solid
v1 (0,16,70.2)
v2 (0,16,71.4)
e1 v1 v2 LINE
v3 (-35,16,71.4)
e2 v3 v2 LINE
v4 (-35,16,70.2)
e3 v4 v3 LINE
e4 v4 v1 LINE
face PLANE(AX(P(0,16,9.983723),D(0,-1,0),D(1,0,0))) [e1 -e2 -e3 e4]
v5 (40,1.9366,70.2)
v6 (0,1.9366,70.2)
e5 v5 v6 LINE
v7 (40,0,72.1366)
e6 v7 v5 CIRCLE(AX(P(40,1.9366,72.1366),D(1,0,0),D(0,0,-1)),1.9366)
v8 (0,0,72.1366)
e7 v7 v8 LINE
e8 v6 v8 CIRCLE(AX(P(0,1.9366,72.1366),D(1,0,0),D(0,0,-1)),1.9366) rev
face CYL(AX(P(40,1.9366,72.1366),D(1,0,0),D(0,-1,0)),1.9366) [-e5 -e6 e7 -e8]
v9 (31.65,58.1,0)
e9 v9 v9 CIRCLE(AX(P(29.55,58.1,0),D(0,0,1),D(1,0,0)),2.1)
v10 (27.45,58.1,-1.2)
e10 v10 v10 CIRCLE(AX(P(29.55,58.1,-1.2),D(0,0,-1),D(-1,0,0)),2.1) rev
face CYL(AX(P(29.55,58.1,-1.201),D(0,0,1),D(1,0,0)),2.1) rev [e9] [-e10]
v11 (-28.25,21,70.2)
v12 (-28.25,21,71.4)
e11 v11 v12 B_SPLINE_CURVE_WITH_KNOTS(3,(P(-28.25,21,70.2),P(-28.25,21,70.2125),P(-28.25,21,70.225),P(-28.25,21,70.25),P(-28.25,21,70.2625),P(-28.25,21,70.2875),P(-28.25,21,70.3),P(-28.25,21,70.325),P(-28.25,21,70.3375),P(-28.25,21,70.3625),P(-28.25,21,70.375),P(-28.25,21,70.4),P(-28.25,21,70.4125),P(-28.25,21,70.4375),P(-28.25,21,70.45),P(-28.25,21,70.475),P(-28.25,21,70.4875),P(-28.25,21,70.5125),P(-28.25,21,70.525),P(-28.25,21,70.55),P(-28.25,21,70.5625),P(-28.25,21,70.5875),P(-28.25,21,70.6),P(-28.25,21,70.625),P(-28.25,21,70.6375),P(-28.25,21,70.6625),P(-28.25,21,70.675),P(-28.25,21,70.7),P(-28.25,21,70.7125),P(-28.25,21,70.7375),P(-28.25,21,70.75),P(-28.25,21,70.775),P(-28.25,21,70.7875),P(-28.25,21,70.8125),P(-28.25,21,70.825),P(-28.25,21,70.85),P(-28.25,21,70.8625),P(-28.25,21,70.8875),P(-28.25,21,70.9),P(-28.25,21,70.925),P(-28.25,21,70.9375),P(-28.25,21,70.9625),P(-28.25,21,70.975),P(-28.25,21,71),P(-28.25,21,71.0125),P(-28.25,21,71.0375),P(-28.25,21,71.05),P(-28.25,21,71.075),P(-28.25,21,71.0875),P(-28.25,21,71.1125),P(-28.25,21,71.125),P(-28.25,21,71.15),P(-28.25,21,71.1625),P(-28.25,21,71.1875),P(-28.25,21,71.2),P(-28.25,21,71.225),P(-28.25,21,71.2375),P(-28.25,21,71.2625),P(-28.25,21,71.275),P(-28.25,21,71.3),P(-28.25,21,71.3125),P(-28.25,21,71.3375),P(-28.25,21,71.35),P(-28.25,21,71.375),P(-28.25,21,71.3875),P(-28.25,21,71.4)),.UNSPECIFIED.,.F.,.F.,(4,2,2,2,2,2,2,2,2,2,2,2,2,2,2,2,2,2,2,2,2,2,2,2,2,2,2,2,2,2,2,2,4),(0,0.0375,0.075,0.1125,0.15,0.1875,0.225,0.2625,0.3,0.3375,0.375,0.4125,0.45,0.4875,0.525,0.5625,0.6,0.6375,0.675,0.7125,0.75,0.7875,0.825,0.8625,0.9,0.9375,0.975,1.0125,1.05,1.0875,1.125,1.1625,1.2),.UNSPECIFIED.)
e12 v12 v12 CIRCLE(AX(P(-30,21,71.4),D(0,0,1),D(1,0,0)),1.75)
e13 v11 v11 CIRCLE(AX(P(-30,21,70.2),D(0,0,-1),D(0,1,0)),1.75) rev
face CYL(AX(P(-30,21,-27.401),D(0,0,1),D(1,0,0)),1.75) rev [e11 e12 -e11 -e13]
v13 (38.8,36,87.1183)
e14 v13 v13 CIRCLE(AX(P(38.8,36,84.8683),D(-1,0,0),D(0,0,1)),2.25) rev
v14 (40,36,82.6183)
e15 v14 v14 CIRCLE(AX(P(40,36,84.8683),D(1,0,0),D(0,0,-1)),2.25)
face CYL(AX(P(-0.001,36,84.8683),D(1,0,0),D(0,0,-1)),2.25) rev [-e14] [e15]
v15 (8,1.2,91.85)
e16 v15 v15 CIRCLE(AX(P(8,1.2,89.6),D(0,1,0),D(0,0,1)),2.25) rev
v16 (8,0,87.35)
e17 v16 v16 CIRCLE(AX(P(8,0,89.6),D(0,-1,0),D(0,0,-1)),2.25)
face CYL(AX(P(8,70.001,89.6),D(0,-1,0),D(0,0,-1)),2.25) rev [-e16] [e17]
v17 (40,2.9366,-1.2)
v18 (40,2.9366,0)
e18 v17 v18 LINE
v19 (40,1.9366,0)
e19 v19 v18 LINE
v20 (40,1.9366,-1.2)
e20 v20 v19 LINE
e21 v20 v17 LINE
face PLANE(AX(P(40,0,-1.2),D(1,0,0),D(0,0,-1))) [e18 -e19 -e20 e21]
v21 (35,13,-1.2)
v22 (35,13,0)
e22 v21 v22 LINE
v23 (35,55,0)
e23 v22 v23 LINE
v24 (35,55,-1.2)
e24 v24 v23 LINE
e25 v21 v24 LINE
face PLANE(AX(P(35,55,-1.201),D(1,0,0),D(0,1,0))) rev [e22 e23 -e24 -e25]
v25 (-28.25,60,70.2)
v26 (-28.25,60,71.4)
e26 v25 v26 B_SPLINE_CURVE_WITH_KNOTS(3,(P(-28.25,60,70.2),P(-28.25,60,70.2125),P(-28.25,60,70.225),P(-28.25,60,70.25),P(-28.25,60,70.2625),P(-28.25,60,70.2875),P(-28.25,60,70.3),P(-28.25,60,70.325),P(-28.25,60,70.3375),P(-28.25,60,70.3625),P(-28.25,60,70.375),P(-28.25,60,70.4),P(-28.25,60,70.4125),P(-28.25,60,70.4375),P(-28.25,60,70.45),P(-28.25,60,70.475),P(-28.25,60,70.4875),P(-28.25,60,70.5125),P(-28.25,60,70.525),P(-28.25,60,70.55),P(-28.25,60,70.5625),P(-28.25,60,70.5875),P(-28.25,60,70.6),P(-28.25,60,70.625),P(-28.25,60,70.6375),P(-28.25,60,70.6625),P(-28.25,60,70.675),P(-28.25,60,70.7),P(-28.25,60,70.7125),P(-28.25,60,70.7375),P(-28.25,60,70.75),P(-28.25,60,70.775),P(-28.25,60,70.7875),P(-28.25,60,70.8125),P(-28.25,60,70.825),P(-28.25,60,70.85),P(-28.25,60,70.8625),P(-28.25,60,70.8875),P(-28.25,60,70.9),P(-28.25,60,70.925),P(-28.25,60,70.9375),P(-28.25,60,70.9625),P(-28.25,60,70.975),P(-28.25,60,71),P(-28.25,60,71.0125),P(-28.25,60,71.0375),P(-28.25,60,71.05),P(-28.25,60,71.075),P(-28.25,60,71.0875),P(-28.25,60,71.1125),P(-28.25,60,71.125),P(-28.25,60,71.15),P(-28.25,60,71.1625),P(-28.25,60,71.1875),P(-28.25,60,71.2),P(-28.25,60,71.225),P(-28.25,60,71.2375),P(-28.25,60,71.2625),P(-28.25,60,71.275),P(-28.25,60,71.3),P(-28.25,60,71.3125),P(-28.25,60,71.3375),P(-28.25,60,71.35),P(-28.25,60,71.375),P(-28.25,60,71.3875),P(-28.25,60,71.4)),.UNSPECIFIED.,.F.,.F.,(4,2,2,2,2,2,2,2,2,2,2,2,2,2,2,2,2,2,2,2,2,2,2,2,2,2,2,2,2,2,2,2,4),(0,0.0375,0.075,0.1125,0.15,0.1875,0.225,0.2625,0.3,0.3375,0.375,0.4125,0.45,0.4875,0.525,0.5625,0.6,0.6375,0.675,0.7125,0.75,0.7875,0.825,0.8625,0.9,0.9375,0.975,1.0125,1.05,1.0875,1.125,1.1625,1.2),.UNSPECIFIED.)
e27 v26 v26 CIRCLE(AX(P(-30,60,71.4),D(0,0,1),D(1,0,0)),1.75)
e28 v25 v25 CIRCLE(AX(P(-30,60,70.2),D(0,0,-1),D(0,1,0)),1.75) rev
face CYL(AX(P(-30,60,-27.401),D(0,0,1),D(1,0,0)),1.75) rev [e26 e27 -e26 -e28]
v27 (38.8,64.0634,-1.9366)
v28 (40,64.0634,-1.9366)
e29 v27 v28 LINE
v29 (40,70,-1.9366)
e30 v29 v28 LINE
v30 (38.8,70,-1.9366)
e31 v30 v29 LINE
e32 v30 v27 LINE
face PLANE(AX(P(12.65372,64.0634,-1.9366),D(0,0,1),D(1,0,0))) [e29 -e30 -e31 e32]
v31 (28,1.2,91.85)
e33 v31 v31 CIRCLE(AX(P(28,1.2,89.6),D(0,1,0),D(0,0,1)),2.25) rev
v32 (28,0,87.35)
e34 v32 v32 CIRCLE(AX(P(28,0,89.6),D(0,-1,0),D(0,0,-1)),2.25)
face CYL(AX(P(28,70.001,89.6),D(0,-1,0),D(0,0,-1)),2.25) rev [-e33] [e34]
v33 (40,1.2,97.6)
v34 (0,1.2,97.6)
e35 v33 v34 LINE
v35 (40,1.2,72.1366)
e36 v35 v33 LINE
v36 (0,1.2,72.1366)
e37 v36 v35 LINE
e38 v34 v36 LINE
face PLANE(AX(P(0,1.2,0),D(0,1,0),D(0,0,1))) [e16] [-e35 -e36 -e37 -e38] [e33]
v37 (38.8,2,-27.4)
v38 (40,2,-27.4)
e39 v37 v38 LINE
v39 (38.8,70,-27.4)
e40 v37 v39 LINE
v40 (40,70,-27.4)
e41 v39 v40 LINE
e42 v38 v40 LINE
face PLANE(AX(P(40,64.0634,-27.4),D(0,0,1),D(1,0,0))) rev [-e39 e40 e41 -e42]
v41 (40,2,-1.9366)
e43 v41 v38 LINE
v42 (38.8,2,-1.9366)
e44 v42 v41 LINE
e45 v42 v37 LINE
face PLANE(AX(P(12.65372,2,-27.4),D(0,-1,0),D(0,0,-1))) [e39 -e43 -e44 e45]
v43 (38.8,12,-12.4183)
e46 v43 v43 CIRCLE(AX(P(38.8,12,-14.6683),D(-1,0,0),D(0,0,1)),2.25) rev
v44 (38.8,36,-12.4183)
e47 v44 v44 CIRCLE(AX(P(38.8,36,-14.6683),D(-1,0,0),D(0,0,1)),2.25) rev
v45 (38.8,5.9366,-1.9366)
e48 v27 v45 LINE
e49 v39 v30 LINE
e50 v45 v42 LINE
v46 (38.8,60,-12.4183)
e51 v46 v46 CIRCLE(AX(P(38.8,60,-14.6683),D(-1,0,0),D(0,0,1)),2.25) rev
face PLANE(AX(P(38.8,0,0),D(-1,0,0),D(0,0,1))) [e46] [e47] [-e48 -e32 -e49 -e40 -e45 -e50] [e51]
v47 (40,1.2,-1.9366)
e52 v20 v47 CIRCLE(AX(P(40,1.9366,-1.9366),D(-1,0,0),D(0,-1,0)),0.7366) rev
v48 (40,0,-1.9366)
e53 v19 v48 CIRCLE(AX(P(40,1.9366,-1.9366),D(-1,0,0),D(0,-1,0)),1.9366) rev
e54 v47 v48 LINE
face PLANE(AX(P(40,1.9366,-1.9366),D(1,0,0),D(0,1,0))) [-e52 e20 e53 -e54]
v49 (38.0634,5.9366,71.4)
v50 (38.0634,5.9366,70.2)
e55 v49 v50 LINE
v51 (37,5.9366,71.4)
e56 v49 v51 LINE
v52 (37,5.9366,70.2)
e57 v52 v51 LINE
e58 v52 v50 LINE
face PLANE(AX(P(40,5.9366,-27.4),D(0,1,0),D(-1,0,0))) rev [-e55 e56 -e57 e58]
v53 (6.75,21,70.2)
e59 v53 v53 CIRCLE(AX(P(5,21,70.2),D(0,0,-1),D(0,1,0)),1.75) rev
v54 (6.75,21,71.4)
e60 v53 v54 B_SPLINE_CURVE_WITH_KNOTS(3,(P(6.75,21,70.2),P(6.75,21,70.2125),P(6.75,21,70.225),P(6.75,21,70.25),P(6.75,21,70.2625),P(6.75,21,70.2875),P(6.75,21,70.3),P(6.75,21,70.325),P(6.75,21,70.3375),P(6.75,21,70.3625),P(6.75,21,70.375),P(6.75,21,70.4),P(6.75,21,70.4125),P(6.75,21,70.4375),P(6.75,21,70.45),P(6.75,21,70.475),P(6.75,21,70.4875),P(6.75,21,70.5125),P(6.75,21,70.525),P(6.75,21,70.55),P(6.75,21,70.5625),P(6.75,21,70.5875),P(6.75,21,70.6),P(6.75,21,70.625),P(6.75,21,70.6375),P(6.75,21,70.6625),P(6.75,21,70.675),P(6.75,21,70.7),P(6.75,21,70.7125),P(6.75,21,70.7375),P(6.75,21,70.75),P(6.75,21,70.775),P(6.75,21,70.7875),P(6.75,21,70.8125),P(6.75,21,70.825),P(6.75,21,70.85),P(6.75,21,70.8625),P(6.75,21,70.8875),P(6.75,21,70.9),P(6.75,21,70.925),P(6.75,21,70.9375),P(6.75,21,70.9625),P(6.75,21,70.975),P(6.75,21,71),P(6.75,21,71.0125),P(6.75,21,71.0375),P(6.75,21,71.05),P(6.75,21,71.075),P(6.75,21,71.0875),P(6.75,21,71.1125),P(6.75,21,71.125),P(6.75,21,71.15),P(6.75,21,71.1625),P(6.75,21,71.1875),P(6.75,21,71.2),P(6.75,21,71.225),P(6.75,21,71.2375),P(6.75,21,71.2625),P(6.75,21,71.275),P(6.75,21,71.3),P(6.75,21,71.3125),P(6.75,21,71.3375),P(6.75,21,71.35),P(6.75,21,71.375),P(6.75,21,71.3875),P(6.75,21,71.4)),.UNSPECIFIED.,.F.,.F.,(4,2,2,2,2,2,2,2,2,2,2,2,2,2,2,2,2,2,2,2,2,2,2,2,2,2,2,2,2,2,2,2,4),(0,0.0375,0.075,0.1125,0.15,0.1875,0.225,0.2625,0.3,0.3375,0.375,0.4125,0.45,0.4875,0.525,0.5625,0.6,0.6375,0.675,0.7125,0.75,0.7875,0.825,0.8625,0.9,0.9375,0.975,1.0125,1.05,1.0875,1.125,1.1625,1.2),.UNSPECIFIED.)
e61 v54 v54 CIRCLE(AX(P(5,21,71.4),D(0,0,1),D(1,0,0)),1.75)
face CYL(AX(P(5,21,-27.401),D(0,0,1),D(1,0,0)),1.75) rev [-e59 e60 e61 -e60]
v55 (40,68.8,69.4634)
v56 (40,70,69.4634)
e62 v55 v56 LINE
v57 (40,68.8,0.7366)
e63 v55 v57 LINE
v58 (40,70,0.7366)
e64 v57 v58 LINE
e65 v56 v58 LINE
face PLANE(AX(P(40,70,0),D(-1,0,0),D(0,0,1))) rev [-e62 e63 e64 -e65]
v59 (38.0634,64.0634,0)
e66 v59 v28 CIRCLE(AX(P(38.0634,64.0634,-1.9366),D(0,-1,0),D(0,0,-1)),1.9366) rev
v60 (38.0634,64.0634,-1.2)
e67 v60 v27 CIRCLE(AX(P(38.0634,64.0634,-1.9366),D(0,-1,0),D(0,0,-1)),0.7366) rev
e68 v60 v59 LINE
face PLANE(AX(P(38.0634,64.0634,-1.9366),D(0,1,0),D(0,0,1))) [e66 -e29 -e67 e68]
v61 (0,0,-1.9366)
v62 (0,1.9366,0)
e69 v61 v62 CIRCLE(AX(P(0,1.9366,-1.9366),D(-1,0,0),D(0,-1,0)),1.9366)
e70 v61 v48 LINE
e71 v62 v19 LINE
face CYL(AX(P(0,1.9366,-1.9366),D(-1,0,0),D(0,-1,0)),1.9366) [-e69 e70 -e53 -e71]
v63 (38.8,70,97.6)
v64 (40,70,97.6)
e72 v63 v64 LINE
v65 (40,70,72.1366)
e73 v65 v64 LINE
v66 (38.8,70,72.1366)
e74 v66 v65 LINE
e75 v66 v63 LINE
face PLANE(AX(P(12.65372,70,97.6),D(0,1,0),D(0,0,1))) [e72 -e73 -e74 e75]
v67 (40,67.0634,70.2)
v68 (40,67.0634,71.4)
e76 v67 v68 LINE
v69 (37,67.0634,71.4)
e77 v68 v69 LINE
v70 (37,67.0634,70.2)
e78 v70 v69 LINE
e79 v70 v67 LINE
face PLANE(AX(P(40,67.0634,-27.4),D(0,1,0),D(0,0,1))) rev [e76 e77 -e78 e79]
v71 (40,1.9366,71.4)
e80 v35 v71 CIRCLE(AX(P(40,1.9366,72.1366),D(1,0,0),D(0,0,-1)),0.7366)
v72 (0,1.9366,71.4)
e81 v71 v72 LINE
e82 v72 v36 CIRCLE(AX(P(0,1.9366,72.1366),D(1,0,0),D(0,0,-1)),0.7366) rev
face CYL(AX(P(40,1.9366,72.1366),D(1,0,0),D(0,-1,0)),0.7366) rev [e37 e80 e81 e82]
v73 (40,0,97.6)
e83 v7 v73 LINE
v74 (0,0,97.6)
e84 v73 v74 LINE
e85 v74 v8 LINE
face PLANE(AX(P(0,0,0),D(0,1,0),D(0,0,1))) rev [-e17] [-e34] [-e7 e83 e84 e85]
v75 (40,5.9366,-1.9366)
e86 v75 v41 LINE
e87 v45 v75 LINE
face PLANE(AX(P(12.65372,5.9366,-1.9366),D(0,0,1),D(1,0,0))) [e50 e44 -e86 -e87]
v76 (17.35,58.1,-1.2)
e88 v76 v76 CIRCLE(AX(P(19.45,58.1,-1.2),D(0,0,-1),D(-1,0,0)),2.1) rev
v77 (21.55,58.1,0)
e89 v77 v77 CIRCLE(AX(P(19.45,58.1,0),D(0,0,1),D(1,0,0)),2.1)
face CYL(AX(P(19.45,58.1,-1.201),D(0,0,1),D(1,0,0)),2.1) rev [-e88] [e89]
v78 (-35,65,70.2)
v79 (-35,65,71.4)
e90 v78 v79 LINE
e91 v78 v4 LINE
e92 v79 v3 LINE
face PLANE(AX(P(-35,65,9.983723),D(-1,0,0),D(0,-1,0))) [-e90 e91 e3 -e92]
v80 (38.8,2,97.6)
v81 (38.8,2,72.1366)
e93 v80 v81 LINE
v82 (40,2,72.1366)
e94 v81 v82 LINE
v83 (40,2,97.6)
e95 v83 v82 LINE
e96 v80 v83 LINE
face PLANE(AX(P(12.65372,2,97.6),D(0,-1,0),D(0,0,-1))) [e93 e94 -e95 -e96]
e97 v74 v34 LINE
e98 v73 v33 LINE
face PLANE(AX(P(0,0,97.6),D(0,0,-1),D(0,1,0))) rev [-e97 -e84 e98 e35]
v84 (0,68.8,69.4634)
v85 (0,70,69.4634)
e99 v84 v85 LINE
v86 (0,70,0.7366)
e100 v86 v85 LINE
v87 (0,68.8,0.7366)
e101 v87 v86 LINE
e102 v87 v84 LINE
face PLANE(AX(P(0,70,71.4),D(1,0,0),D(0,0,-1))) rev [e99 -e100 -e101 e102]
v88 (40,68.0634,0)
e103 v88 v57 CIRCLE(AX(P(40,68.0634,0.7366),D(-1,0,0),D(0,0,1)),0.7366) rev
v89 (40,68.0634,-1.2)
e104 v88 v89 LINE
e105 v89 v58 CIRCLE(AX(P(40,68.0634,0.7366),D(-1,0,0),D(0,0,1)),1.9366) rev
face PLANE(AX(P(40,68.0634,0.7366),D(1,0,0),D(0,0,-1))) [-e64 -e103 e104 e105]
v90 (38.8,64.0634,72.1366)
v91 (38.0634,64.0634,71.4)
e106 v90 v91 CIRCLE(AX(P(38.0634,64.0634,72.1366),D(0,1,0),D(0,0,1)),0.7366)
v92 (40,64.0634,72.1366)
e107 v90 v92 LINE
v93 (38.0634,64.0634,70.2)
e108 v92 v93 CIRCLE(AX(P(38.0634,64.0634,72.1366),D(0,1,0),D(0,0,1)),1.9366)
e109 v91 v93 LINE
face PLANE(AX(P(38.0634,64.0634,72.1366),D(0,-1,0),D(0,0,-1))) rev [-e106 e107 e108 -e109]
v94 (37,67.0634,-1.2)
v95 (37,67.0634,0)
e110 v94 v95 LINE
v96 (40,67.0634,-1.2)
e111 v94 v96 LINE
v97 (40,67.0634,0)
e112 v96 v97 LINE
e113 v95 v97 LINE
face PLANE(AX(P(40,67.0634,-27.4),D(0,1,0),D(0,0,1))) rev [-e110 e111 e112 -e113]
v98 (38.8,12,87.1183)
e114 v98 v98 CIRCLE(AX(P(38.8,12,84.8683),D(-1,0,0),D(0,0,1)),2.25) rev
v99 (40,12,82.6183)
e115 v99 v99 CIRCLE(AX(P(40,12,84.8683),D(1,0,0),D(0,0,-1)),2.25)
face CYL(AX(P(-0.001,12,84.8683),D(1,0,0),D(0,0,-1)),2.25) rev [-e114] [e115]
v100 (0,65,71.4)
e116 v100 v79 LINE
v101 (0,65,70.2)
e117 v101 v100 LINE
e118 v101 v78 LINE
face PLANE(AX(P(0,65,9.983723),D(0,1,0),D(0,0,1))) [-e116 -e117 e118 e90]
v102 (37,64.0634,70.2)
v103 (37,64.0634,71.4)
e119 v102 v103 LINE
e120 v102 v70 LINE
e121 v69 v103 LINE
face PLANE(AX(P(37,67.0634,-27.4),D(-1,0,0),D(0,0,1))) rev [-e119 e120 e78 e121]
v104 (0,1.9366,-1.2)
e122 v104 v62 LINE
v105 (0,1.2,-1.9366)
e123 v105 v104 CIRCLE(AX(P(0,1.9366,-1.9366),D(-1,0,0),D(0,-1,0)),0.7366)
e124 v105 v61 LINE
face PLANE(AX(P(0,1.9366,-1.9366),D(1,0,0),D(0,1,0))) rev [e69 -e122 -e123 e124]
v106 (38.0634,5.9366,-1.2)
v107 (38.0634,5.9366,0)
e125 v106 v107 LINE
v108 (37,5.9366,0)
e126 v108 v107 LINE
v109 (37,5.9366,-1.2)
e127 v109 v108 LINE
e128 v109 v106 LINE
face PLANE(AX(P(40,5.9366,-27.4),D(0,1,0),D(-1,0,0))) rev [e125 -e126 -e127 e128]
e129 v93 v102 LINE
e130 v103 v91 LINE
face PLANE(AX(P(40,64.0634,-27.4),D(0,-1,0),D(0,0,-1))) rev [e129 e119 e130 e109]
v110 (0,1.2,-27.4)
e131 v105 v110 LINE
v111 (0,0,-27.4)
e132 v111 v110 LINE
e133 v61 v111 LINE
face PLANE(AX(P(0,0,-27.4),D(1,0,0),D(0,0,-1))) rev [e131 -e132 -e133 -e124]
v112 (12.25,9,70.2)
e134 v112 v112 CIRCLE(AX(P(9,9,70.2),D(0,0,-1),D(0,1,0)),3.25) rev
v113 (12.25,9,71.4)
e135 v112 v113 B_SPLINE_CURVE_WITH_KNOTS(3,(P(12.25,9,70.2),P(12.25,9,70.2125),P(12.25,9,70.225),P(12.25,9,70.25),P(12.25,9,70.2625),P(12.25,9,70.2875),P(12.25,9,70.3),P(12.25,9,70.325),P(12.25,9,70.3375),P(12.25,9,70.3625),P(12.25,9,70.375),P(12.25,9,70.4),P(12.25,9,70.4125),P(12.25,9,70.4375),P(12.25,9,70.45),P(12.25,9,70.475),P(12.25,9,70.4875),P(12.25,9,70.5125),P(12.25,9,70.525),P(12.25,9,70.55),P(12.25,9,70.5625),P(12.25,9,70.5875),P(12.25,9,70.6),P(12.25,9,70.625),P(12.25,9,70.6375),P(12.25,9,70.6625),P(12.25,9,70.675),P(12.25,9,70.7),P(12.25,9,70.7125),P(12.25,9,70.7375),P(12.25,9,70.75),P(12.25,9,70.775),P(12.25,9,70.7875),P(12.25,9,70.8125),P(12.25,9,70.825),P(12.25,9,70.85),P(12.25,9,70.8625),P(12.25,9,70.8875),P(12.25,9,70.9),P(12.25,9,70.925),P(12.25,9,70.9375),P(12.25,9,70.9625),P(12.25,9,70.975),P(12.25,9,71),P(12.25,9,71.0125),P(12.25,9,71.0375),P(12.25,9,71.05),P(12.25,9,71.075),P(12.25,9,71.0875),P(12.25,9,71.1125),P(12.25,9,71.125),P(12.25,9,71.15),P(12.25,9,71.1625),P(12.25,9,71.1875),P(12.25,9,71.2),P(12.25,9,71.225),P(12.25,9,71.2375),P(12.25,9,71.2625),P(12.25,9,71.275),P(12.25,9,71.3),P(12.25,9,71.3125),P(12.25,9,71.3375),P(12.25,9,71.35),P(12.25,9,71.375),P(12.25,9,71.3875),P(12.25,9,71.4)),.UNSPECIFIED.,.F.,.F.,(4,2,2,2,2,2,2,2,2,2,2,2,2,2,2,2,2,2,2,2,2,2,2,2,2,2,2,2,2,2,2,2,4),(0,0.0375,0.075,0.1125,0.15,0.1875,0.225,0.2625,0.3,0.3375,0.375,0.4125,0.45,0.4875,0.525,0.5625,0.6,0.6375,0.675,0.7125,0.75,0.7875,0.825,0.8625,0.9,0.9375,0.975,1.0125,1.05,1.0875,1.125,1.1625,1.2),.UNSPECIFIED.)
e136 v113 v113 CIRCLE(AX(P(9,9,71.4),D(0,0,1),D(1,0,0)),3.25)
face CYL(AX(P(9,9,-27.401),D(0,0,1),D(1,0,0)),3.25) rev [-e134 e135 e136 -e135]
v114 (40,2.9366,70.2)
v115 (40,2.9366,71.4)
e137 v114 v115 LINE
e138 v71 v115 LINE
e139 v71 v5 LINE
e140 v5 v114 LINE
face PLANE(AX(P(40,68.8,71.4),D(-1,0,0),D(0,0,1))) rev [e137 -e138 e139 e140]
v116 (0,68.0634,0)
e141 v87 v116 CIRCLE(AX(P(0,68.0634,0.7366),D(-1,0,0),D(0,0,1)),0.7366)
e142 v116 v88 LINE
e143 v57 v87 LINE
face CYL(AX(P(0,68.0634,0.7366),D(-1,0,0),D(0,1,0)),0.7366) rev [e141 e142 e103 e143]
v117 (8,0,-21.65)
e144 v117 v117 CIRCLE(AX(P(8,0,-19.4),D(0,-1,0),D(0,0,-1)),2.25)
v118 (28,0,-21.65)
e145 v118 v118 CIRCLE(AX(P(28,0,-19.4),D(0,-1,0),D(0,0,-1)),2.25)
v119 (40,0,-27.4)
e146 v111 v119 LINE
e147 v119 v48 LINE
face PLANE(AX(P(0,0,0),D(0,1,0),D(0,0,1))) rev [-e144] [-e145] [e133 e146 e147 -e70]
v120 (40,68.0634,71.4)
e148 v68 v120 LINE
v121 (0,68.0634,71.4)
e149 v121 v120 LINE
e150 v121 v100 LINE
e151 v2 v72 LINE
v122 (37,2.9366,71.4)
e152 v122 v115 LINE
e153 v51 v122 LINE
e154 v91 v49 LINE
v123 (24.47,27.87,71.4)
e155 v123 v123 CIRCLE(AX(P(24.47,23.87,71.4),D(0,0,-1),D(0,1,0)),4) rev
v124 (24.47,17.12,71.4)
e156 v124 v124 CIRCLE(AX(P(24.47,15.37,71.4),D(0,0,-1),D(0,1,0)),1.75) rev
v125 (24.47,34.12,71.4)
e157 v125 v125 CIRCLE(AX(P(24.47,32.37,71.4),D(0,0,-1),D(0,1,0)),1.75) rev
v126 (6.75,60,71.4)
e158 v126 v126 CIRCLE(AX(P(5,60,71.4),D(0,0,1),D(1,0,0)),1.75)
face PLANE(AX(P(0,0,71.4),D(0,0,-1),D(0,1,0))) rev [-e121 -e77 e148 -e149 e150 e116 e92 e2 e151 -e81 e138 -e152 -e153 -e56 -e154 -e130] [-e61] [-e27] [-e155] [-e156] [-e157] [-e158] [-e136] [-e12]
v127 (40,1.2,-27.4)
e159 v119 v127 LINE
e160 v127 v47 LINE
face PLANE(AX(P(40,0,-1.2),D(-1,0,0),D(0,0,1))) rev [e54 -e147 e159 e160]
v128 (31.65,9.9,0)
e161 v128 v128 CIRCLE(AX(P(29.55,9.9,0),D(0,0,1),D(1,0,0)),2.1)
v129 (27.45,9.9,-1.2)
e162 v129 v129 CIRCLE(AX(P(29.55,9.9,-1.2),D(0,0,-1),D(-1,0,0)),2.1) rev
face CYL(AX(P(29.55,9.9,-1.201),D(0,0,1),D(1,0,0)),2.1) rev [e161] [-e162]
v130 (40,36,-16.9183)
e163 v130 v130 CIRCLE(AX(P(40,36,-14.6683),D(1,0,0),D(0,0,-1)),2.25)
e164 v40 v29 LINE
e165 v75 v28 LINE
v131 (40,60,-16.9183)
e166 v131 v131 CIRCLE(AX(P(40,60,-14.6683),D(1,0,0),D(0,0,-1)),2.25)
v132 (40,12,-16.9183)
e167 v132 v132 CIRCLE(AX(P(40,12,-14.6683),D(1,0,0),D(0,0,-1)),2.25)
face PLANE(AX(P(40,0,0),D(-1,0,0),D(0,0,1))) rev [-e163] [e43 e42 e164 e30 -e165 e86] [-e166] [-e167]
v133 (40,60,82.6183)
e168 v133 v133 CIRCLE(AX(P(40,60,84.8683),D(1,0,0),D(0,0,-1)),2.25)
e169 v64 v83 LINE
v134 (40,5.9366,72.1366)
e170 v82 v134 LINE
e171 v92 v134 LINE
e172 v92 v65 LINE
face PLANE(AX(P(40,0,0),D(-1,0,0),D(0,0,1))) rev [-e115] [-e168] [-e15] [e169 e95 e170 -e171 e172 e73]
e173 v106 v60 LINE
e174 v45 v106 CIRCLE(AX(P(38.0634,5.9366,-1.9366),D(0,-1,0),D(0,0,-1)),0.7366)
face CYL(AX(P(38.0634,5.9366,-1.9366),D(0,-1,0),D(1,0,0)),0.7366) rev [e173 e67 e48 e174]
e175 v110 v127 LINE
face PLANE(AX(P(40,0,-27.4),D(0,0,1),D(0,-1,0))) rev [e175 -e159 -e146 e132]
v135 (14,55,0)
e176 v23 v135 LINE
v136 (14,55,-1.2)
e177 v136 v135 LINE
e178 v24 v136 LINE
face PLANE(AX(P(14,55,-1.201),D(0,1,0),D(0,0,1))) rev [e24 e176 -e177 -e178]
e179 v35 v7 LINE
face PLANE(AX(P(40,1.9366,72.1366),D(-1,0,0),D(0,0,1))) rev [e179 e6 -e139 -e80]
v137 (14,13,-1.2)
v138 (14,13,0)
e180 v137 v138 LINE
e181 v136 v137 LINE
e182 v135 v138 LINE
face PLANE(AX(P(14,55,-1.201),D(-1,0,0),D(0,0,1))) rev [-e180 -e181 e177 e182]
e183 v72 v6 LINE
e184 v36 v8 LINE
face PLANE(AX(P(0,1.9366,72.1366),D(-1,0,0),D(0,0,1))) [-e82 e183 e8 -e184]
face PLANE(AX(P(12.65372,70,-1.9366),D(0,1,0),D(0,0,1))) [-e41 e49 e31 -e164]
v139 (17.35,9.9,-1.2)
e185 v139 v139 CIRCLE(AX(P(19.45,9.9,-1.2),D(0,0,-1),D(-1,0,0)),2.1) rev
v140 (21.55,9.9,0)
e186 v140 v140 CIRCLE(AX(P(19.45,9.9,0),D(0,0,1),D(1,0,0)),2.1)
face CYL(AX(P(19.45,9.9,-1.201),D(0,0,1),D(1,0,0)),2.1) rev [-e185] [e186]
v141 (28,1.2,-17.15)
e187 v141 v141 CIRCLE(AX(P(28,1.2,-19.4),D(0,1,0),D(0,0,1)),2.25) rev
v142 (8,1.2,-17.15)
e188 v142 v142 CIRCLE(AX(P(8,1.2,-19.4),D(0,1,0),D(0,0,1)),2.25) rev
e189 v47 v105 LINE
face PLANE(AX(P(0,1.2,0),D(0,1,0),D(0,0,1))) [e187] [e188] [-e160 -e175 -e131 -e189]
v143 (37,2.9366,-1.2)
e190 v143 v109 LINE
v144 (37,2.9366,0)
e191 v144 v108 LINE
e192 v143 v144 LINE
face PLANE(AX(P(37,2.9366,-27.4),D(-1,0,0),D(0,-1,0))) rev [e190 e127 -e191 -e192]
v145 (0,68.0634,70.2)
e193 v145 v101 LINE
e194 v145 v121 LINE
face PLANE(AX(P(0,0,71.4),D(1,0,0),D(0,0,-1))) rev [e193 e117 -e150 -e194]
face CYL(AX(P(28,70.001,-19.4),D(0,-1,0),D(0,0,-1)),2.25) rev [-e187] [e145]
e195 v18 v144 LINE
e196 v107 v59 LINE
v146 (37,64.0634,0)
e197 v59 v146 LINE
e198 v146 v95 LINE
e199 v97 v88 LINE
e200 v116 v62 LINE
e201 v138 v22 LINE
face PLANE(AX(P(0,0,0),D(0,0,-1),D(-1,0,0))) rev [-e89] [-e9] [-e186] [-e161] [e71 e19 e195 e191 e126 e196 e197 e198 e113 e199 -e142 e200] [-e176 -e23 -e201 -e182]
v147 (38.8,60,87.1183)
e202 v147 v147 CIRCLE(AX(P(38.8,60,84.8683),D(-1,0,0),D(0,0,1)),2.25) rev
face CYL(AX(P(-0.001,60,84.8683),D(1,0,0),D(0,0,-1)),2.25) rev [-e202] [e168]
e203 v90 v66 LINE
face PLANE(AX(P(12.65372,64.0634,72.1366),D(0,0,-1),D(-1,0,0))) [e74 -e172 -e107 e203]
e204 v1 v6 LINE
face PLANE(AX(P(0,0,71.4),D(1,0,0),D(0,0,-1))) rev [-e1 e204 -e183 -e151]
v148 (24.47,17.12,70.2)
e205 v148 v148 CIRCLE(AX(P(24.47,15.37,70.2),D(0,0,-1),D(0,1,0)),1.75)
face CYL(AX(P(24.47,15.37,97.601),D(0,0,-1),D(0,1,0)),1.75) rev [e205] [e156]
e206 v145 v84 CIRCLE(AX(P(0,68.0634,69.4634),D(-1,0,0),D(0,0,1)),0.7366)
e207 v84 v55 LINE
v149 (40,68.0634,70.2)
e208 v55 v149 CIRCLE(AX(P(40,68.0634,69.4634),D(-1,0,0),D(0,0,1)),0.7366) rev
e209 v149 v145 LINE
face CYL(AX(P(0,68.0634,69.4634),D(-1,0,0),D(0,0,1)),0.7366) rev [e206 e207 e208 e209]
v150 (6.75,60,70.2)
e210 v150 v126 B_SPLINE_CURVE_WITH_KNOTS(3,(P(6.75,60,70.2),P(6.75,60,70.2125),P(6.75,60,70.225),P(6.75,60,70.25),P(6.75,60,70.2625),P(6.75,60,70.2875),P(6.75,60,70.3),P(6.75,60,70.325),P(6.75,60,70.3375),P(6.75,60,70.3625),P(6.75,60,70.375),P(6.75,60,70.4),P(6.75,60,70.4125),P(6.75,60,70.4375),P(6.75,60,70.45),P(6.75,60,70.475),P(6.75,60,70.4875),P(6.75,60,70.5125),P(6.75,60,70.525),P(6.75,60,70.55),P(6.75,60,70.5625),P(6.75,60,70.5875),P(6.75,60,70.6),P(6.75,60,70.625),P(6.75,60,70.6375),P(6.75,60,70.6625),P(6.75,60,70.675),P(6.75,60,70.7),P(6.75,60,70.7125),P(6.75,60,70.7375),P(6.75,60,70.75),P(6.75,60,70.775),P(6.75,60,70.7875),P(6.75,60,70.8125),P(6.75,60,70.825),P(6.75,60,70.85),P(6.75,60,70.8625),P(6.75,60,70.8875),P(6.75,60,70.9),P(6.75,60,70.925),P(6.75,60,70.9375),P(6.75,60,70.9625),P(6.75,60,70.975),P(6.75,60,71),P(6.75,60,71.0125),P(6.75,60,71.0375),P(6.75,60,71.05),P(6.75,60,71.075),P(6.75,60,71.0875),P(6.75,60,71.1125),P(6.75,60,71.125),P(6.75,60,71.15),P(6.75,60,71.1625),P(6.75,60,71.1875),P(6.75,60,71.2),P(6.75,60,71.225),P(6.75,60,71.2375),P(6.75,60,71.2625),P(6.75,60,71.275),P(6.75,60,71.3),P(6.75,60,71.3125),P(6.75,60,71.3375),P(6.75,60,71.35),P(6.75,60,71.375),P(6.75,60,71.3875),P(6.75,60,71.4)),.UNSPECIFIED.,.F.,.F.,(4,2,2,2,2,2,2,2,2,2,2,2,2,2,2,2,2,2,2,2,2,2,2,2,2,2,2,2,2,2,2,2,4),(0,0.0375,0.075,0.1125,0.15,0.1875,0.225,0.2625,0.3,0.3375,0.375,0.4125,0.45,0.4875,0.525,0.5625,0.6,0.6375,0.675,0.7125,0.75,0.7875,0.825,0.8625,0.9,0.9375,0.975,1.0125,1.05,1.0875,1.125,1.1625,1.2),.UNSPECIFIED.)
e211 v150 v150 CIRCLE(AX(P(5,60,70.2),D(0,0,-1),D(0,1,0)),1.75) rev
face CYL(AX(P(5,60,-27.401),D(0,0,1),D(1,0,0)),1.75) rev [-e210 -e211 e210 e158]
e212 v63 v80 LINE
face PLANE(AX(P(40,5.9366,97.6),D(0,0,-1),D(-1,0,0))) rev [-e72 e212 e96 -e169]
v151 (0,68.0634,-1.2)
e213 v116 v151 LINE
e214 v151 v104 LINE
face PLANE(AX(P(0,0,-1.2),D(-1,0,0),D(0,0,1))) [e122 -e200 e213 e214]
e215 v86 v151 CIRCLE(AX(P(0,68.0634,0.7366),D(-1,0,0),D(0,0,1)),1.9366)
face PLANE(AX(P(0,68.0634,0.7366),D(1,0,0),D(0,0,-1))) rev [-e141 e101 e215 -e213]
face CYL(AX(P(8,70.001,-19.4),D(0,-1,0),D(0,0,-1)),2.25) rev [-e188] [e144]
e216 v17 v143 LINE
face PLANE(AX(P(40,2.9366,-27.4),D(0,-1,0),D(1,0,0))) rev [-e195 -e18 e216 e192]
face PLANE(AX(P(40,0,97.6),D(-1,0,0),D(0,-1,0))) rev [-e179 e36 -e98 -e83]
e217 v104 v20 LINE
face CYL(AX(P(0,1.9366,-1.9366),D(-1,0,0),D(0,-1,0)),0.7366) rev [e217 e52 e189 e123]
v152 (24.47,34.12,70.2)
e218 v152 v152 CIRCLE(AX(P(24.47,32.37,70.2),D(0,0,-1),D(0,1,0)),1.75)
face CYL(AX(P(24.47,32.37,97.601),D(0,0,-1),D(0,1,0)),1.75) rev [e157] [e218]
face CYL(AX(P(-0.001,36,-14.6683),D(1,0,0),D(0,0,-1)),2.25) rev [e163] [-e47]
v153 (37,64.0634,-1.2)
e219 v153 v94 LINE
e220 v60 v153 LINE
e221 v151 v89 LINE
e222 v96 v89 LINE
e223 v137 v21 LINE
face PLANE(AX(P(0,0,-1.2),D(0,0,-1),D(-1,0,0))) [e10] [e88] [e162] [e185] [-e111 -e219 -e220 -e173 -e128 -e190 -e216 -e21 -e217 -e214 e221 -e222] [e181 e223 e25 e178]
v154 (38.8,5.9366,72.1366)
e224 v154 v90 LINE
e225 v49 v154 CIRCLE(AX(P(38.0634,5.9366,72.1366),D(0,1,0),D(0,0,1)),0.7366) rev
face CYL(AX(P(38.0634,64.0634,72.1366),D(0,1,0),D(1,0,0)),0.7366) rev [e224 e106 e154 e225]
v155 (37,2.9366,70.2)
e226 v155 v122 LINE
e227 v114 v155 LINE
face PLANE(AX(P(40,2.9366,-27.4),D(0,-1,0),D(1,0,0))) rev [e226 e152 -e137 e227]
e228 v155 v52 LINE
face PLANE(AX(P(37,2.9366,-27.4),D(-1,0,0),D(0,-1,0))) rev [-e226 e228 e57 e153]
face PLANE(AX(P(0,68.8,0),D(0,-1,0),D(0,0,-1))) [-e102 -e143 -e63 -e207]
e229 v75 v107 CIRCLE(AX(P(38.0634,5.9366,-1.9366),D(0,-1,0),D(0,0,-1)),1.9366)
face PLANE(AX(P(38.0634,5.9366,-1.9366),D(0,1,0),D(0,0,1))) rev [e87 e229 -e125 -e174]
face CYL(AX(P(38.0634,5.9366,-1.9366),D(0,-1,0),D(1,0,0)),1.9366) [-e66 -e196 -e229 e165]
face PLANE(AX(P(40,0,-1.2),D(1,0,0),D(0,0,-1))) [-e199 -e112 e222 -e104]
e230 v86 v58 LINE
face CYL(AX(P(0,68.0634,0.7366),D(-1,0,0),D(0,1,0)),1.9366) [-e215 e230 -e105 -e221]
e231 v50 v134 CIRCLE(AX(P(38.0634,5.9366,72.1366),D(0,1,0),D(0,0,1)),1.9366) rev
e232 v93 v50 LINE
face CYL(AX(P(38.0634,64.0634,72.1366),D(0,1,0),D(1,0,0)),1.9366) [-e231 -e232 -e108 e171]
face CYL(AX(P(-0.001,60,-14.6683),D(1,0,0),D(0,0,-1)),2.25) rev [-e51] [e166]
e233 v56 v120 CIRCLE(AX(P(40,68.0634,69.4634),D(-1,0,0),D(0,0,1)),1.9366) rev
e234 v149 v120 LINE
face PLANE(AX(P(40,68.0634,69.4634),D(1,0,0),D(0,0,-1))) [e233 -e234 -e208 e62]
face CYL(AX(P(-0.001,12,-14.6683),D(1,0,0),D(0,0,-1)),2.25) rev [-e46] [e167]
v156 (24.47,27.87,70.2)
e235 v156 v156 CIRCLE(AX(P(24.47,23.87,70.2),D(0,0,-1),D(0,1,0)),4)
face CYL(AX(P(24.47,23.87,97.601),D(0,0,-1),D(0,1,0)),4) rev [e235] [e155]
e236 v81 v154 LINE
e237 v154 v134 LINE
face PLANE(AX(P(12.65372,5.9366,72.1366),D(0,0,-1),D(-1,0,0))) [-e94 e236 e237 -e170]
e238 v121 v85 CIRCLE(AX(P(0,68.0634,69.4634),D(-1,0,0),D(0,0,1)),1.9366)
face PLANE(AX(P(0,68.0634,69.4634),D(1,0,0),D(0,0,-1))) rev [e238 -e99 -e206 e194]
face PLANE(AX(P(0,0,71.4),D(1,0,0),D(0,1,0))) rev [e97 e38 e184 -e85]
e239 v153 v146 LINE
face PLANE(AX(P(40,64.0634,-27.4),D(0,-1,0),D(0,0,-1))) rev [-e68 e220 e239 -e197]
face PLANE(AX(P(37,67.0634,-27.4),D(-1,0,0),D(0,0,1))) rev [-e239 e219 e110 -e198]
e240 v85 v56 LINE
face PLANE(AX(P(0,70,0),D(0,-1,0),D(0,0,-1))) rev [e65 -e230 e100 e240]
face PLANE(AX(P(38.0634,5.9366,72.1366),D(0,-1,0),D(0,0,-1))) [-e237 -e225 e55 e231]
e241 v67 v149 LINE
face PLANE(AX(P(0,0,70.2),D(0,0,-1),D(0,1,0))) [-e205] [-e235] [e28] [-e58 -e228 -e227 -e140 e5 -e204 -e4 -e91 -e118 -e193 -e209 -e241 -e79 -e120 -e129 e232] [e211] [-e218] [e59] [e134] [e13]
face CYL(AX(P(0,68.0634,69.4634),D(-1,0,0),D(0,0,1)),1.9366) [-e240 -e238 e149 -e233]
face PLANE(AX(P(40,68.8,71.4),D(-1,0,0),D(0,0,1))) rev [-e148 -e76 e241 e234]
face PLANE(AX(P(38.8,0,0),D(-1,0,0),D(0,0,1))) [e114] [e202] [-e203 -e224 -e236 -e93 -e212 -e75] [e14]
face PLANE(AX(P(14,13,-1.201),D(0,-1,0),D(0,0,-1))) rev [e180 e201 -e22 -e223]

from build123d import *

# Parameters (mm, degrees)
SKETCH_1_W                        = 40
SKETCH_1_H                        = 70
SM_BASE_FLANGE_1_DEPTH            = 1.2
CUT_EXTRUDE_1_REACH               = 82.632
SKETCH_6_R                        = 2.1
SKETCH_6_W                        = 21
SKETCH_6_H                        = 42
SM_EDGE_FLANGE_6_STRIP_W          = 6.2732
SM_EDGE_FLANGE_6_STRIP_H          = 1.2
SM_EDGE_FLANGE_6_STRIP_CUT_DEPTH  = 40
SM_EDGE_FLANGE_6_DEPTH            = 40
SM_EDGE_FLANGE_7_STRIP_W          = 6.2732
SM_EDGE_FLANGE_7_STRIP_H          = 1.2
SM_EDGE_FLANGE_7_STRIP_CUT_DEPTH  = 40
SM_EDGE_FLANGE_7_DEPTH            = 40
SM_EDGE_FLANGE_8_STRIP_W          = 6.2732
SM_EDGE_FLANGE_8_STRIP_H          = 1.2
SM_EDGE_FLANGE_8_STRIP_CUT_DEPTH  = 40
SM_EDGE_FLANGE_8_DEPTH            = 40
SM_EDGE_FLANGE_9_STRIP_W          = 6.2732
SM_EDGE_FLANGE_9_STRIP_H          = 1.2
SM_EDGE_FLANGE_9_STRIP_CUT_DEPTH  = 40
SM_EDGE_FLANGE_9_DEPTH            = 40
SKETCH_50_W                       = 3
SKETCH_50_H                       = 3
CUT_EXTRUDE_7_DEPTH               = 128.520351317
SM_EDGE_FLANGE_13_STRIP_W         = 6.2732
SM_EDGE_FLANGE_13_STRIP_H         = 1.2
SM_EDGE_FLANGE_13_STRIP_CUT_DEPTH = 58.1268
SM_EDGE_FLANGE_13_DEPTH           = 58.1268
SM_EDGE_FLANGE_14_STRIP_W         = 6.2732
SM_EDGE_FLANGE_14_STRIP_H         = 1.2
SM_EDGE_FLANGE_14_STRIP_CUT_DEPTH = 58.1268
SM_EDGE_FLANGE_14_DEPTH           = 58.1268
SKETCH_57_W                       = 25.4634
SKETCH_57_H                       = 5.9366
SKETCH_57_H_2                     = 3.9366
EXTRUDE_1_DEPTH                   = 1.2
CUT_EXTRUDE_9_REACH               = 128.593
SKETCH_58_R                       = 2.25
CUT_EXTRUDE_8_REACH               = 128.593
SKETCH_59_R                       = 2.25
SKETCH_60_W                       = 35
SKETCH_60_H                       = 49
EXTRUDE_2_DEPTH                   = 1.2
CUT_EXTRUDE_10_REACH              = 129.52
SKETCH_61_R                       = 1.75
CUT_EXTRUDE_11_REACH              = 128.593
SKETCH_62_R                       = 4
SKETCH_62_R_2                     = 1.75
CUT_EXTRUDE_12_REACH              = 129.52
SKETCH_63_R                       = 3.25


# Sheet-metal steps are written as plain solids
with BuildPart() as part:
    # Sketch 1 → Базовая кромка1 (new body)
    with BuildSketch(Plane.XY):
        with Locations((20, 35)):
            Rectangle(SKETCH_1_W, SKETCH_1_H)
    extrude(amount=-SM_BASE_FLANGE_1_DEPTH)

    # Эскиз6 → Вырез-Вытянуть1 (cut, up to next)
    with BuildSketch(Plane.XY, mode=Mode.PRIVATE) as cut_extrude_1_sk1:
        with Locations((19.45, 58.1)):
            Circle(SKETCH_6_R)
    cut_extrude_1_tool1 = extrude(cut_extrude_1_sk1.sketch, amount=-CUT_EXTRUDE_1_REACH, mode=Mode.PRIVATE) & part.part
    # Эскиз6 → Вырез-Вытянуть1 (cut, up to next)
    with BuildSketch(Plane.XY, mode=Mode.PRIVATE) as cut_extrude_1_sk2:
        with Locations((29.55, 58.1)):
            Circle(SKETCH_6_R)
    cut_extrude_1_tool2 = extrude(cut_extrude_1_sk2.sketch, amount=-CUT_EXTRUDE_1_REACH, mode=Mode.PRIVATE) & part.part
    # Эскиз6 → Вырез-Вытянуть1 (cut, up to next)
    with BuildSketch(Plane.XY, mode=Mode.PRIVATE) as cut_extrude_1_sk3:
        with Locations((19.45, 9.9)):
            Circle(SKETCH_6_R)
    cut_extrude_1_tool3 = extrude(cut_extrude_1_sk3.sketch, amount=-CUT_EXTRUDE_1_REACH, mode=Mode.PRIVATE) & part.part
    # Эскиз6 → Вырез-Вытянуть1 (cut, up to next)
    with BuildSketch(Plane.XY, mode=Mode.PRIVATE) as cut_extrude_1_sk4:
        with Locations((29.55, 9.9)):
            Circle(SKETCH_6_R)
    cut_extrude_1_tool4 = extrude(cut_extrude_1_sk4.sketch, amount=-CUT_EXTRUDE_1_REACH, mode=Mode.PRIVATE) & part.part
    # Эскиз6 → Вырез-Вытянуть1 (cut, up to next)
    with BuildSketch(Plane.XY, mode=Mode.PRIVATE) as cut_extrude_1_sk5:
        with Locations((24.5, 34)):
            Rectangle(SKETCH_6_W, SKETCH_6_H)
    cut_extrude_1_tool5 = extrude(cut_extrude_1_sk5.sketch, amount=-CUT_EXTRUDE_1_REACH, mode=Mode.PRIVATE) & part.part
    add(cut_extrude_1_tool1.solids().sort_by_distance((19.45, 58.1, 0))[0], mode=Mode.SUBTRACT)
    add(cut_extrude_1_tool2.solids().sort_by_distance((29.55, 58.1, 0))[0], mode=Mode.SUBTRACT)
    add(cut_extrude_1_tool3.solids().sort_by_distance((19.45, 9.9, 0))[0], mode=Mode.SUBTRACT)
    add(cut_extrude_1_tool4.solids().sort_by_distance((29.55, 9.9, 0))[0], mode=Mode.SUBTRACT)
    add(cut_extrude_1_tool5.solids().sort_by_distance((24.5, 34, 0))[0], mode=Mode.SUBTRACT)

    # Ребро-кромка6 strip (across the edge) → Ребро-кромка6 strip cut (cut)
    with BuildSketch(Plane(origin=(40, 0, -1.2), x_dir=(0, 1, 0), z_dir=(-1, 0, 0))):
        with Locations((-1.2, -0.6)):
            Rectangle(SM_EDGE_FLANGE_6_STRIP_W, SM_EDGE_FLANGE_6_STRIP_H)
    extrude(amount=SM_EDGE_FLANGE_6_STRIP_CUT_DEPTH, mode=Mode.SUBTRACT)

    # Ребро-кромка6 section (across the edge) → Ребро-кромка6 (add)
    with BuildSketch(Plane(origin=(40, 0, -1.2), x_dir=(0, 1, 0), z_dir=(-1, 0, 0))):
        with BuildLine():
            Line((0, 0.7366), (0, 26.2))
            Line((0, 26.2), (1.2, 26.2))
            Line((1.2, 26.2), (1.2, 0.7366))
            ThreePointArc((1.2, 0.7366), (1.415745145, 0.215745145), (1.9366, 0))
            Line((1.9366, 0), (1.9366, -1.2))
            ThreePointArc((1.9366, -1.2), (0.567217008, -0.632782992), (0, 0.7366))
        make_face()
    extrude(amount=SM_EDGE_FLANGE_6_DEPTH)

    # Ребро-кромка7 strip (across the edge) → Ребро-кромка7 strip cut (cut)
    with BuildSketch(Plane(origin=(40, 70, 0), x_dir=(0, -1, 0), z_dir=(-1, 0, 0))):
        with Locations((-1.2, -0.6)):
            Rectangle(SM_EDGE_FLANGE_7_STRIP_W, SM_EDGE_FLANGE_7_STRIP_H)
    extrude(amount=SM_EDGE_FLANGE_7_STRIP_CUT_DEPTH, mode=Mode.SUBTRACT)

    # Ребро-кромка7 section (across the edge) → Ребро-кромка7 (add)
    with BuildSketch(Plane(origin=(40, 70, 0), x_dir=(0, -1, 0), z_dir=(-1, 0, 0))):
        with BuildLine():
            Line((0, 0.7366), (0, 71.4))
            Line((0, 71.4), (1.2, 71.4))
            Line((1.2, 71.4), (1.2, 0.7366))
            ThreePointArc((1.2, 0.7366), (1.415745145, 0.215745145), (1.9366, 0))
            Line((1.9366, 0), (1.9366, -1.2))
            ThreePointArc((1.9366, -1.2), (0.567217008, -0.632782992), (0, 0.7366))
        make_face()
    extrude(amount=SM_EDGE_FLANGE_7_DEPTH)

    # Ребро-кромка8 strip (across the edge) → Ребро-кромка8 strip cut (cut)
    with BuildSketch(Plane(origin=(40, 68.8, 71.4), x_dir=(0, 0, -1), z_dir=(-1, 0, 0))):
        with Locations((-1.2, -0.6)):
            Rectangle(SM_EDGE_FLANGE_8_STRIP_W, SM_EDGE_FLANGE_8_STRIP_H)
    extrude(amount=SM_EDGE_FLANGE_8_STRIP_CUT_DEPTH, mode=Mode.SUBTRACT)

    # Ребро-кромка8 section (across the edge) → Ребро-кромка8 (add)
    with BuildSketch(Plane(origin=(40, 68.8, 71.4), x_dir=(0, 0, -1), z_dir=(-1, 0, 0))):
        with BuildLine():
            Line((0, 0.7366), (0, 68.8))
            Line((0, 68.8), (1.2, 68.8))
            Line((1.2, 68.8), (1.2, 0.7366))
            ThreePointArc((1.2, 0.7366), (1.415745145, 0.215745145), (1.9366, 0))
            Line((1.9366, 0), (1.9366, -1.2))
            ThreePointArc((1.9366, -1.2), (0.567217008, -0.632782992), (0, 0.7366))
        make_face()
    extrude(amount=SM_EDGE_FLANGE_8_DEPTH)

    # Ребро-кромка9 strip (across the edge) → Ребро-кромка9 strip cut (cut)
    with BuildSketch(Plane(origin=(0, 0, 71.4), x_dir=(0, 1, 0), z_dir=(1, 0, 0))):
        with Locations((-1.2, -0.6)):
            Rectangle(SM_EDGE_FLANGE_9_STRIP_W, SM_EDGE_FLANGE_9_STRIP_H)
    extrude(amount=SM_EDGE_FLANGE_9_STRIP_CUT_DEPTH, mode=Mode.SUBTRACT)

    # Ребро-кромка9 section (across the edge) → Ребро-кромка9 (add)
    with BuildSketch(Plane(origin=(0, 0, 71.4), x_dir=(0, 1, 0), z_dir=(1, 0, 0))):
        with BuildLine():
            Line((0, 0.7366), (0, 26.2))
            Line((0, 26.2), (1.2, 26.2))
            Line((1.2, 26.2), (1.2, 0.7366))
            ThreePointArc((1.2, 0.7366), (1.415745145, 0.215745145), (1.9366, 0))
            Line((1.9366, 0), (1.9366, -1.2))
            ThreePointArc((1.9366, -1.2), (0.567217008, -0.632782992), (0, 0.7366))
        make_face()
    extrude(amount=SM_EDGE_FLANGE_9_DEPTH)

    # Эскиз50 → Вырез-Вытянуть7 (cut, through all)
    with BuildSketch(Plane.XY.offset(71.4)):
        with Locations((38.5, 65.5634)):
            Rectangle(SKETCH_50_W, SKETCH_50_H)
        with Locations((38.5, 4.4366)):
            Rectangle(SKETCH_50_W, SKETCH_50_H)
    extrude(amount=-CUT_EXTRUDE_7_DEPTH, mode=Mode.SUBTRACT)

    # Ребро-кромка13 strip (across the edge) → Ребро-кромка13 strip cut (cut)
    with BuildSketch(Plane(origin=(40, 5.9366, 71.4), x_dir=(-1, 0, 0), z_dir=(0, 1, 0))):
        with Locations((-1.2, -0.6)):
            Rectangle(SM_EDGE_FLANGE_13_STRIP_W, SM_EDGE_FLANGE_13_STRIP_H)
    extrude(amount=SM_EDGE_FLANGE_13_STRIP_CUT_DEPTH, mode=Mode.SUBTRACT)

    # Ребро-кромка13 section (across the edge) → Ребро-кромка13 (add)
    with BuildSketch(Plane(origin=(40, 5.9366, 71.4), x_dir=(-1, 0, 0), z_dir=(0, 1, 0))):
        with BuildLine():
            Line((0, 0.7366), (0, 26.2))
            Line((0, 26.2), (1.2, 26.2))
            Line((1.2, 26.2), (1.2, 0.7366))
            ThreePointArc((1.2, 0.7366), (1.415745145, 0.215745145), (1.9366, 0))
            Line((1.9366, 0), (1.9366, -1.2))
            ThreePointArc((1.9366, -1.2), (0.567217008, -0.632782992), (0, 0.7366))
        make_face()
    extrude(amount=SM_EDGE_FLANGE_13_DEPTH)

    # Ребро-кромка14 strip (across the edge) → Ребро-кромка14 strip cut (cut)
    with BuildSketch(Plane(origin=(40, 64.0634, -1.2), x_dir=(-1, 0, 0), z_dir=(0, -1, 0))):
        with Locations((-1.2, -0.6)):
            Rectangle(SM_EDGE_FLANGE_14_STRIP_W, SM_EDGE_FLANGE_14_STRIP_H)
    extrude(amount=SM_EDGE_FLANGE_14_STRIP_CUT_DEPTH, mode=Mode.SUBTRACT)

    # Ребро-кромка14 section (across the edge) → Ребро-кромка14 (add)
    with BuildSketch(Plane(origin=(40, 64.0634, -1.2), x_dir=(-1, 0, 0), z_dir=(0, -1, 0))):
        with BuildLine():
            Line((0, 0.7366), (0, 26.2))
            Line((0, 26.2), (1.2, 26.2))
            Line((1.2, 26.2), (1.2, 0.7366))
            ThreePointArc((1.2, 0.7366), (1.415745145, 0.215745145), (1.9366, 0))
            Line((1.9366, 0), (1.9366, -1.2))
            ThreePointArc((1.9366, -1.2), (0.567217008, -0.632782992), (0, 0.7366))
        make_face()
    extrude(amount=SM_EDGE_FLANGE_14_DEPTH)

    # Эскиз57 → Бобышка-Вытянуть1 (add)
    with BuildSketch(Plane(origin=(40, 0, 0), x_dir=(0, 0, -1), z_dir=(1, 0, 0))):
        with Locations((-84.8683, 67.0317)):
            Rectangle(SKETCH_57_W, SKETCH_57_H)
        with Locations((-84.8683, 3.9683)):
            Rectangle(SKETCH_57_W, SKETCH_57_H_2)
        with Locations((14.6683, 67.0317)):
            Rectangle(SKETCH_57_W, SKETCH_57_H)
        with Locations((14.6683, 3.9683)):
            Rectangle(SKETCH_57_W, SKETCH_57_H_2)
    extrude(amount=-EXTRUDE_1_DEPTH)

    # Эскиз58 → Вырез-Вытянуть9 (cut, up to next)
    with BuildSketch(Plane(origin=(40, 0, 0), x_dir=(0, 0, -1), z_dir=(1, 0, 0)), mode=Mode.PRIVATE) as cut_extrude_9_sk1:
        with Locations((-84.8683, 60)):
            Circle(SKETCH_58_R)
    cut_extrude_9_tool1 = extrude(cut_extrude_9_sk1.sketch, amount=-CUT_EXTRUDE_9_REACH, mode=Mode.PRIVATE) & part.part
    # Эскиз58 → Вырез-Вытянуть9 (cut, up to next)
    with BuildSketch(Plane(origin=(40, 0, 0), x_dir=(0, 0, -1), z_dir=(1, 0, 0)), mode=Mode.PRIVATE) as cut_extrude_9_sk2:
        with Locations((-84.8683, 12)):
            Circle(SKETCH_58_R)
    cut_extrude_9_tool2 = extrude(cut_extrude_9_sk2.sketch, amount=-CUT_EXTRUDE_9_REACH, mode=Mode.PRIVATE) & part.part
    # Эскиз58 → Вырез-Вытянуть9 (cut, up to next)
    with BuildSketch(Plane(origin=(40, 0, 0), x_dir=(0, 0, -1), z_dir=(1, 0, 0)), mode=Mode.PRIVATE) as cut_extrude_9_sk3:
        with Locations((14.6683, 60)):
            Circle(SKETCH_58_R)
    cut_extrude_9_tool3 = extrude(cut_extrude_9_sk3.sketch, amount=-CUT_EXTRUDE_9_REACH, mode=Mode.PRIVATE) & part.part
    # Эскиз58 → Вырез-Вытянуть9 (cut, up to next)
    with BuildSketch(Plane(origin=(40, 0, 0), x_dir=(0, 0, -1), z_dir=(1, 0, 0)), mode=Mode.PRIVATE) as cut_extrude_9_sk4:
        with Locations((14.6683, 12)):
            Circle(SKETCH_58_R)
    cut_extrude_9_tool4 = extrude(cut_extrude_9_sk4.sketch, amount=-CUT_EXTRUDE_9_REACH, mode=Mode.PRIVATE) & part.part
    # Эскиз58 → Вырез-Вытянуть9 (cut, up to next)
    with BuildSketch(Plane(origin=(40, 0, 0), x_dir=(0, 0, -1), z_dir=(1, 0, 0)), mode=Mode.PRIVATE) as cut_extrude_9_sk5:
        with Locations((-84.8683, 36)):
            Circle(SKETCH_58_R)
    cut_extrude_9_tool5 = extrude(cut_extrude_9_sk5.sketch, amount=-CUT_EXTRUDE_9_REACH, mode=Mode.PRIVATE) & part.part
    # Эскиз58 → Вырез-Вытянуть9 (cut, up to next)
    with BuildSketch(Plane(origin=(40, 0, 0), x_dir=(0, 0, -1), z_dir=(1, 0, 0)), mode=Mode.PRIVATE) as cut_extrude_9_sk6:
        with Locations((14.6683, 36)):
            Circle(SKETCH_58_R)
    cut_extrude_9_tool6 = extrude(cut_extrude_9_sk6.sketch, amount=-CUT_EXTRUDE_9_REACH, mode=Mode.PRIVATE) & part.part
    add(cut_extrude_9_tool1.solids().sort_by_distance((40, 60, 84.8683))[0], mode=Mode.SUBTRACT)
    add(cut_extrude_9_tool2.solids().sort_by_distance((40, 12, 84.8683))[0], mode=Mode.SUBTRACT)
    add(cut_extrude_9_tool3.solids().sort_by_distance((40, 60, -14.6683))[0], mode=Mode.SUBTRACT)
    add(cut_extrude_9_tool4.solids().sort_by_distance((40, 12, -14.6683))[0], mode=Mode.SUBTRACT)
    add(cut_extrude_9_tool5.solids().sort_by_distance((40, 36, 84.8683))[0], mode=Mode.SUBTRACT)
    add(cut_extrude_9_tool6.solids().sort_by_distance((40, 36, -14.6683))[0], mode=Mode.SUBTRACT)

    # Эскиз59 → Вырез-Вытянуть8 (cut, up to next)
    with BuildSketch(Plane.XZ, mode=Mode.PRIVATE) as cut_extrude_8_sk1:
        with Locations(Location((8, 89.6, 0), (0, 0, 270))):
            Circle(SKETCH_59_R)
    cut_extrude_8_tool1 = extrude(cut_extrude_8_sk1.sketch, amount=-CUT_EXTRUDE_8_REACH, mode=Mode.PRIVATE) & part.part
    # Эскиз59 → Вырез-Вытянуть8 (cut, up to next)
    with BuildSketch(Plane.XZ, mode=Mode.PRIVATE) as cut_extrude_8_sk2:
        with Locations(Location((28, 89.6, 0), (0, 0, 270))):
            Circle(SKETCH_59_R)
    cut_extrude_8_tool2 = extrude(cut_extrude_8_sk2.sketch, amount=-CUT_EXTRUDE_8_REACH, mode=Mode.PRIVATE) & part.part
    # Эскиз59 → Вырез-Вытянуть8 (cut, up to next)
    with BuildSketch(Plane.XZ, mode=Mode.PRIVATE) as cut_extrude_8_sk3:
        with Locations(Location((8, -19.4, 0), (0, 0, 270))):
            Circle(SKETCH_59_R)
    cut_extrude_8_tool3 = extrude(cut_extrude_8_sk3.sketch, amount=-CUT_EXTRUDE_8_REACH, mode=Mode.PRIVATE) & part.part
    # Эскиз59 → Вырез-Вытянуть8 (cut, up to next)
    with BuildSketch(Plane.XZ, mode=Mode.PRIVATE) as cut_extrude_8_sk4:
        with Locations(Location((28, -19.4, 0), (0, 0, 270))):
            Circle(SKETCH_59_R)
    cut_extrude_8_tool4 = extrude(cut_extrude_8_sk4.sketch, amount=-CUT_EXTRUDE_8_REACH, mode=Mode.PRIVATE) & part.part
    add(cut_extrude_8_tool1.solids().sort_by_distance((8, 0, 89.6))[0], mode=Mode.SUBTRACT)
    add(cut_extrude_8_tool2.solids().sort_by_distance((28, 0, 89.6))[0], mode=Mode.SUBTRACT)
    add(cut_extrude_8_tool3.solids().sort_by_distance((8, 0, -19.4))[0], mode=Mode.SUBTRACT)
    add(cut_extrude_8_tool4.solids().sort_by_distance((28, 0, -19.4))[0], mode=Mode.SUBTRACT)

    # Эскиз60 → Бобышка-Вытянуть2 (add)
    with BuildSketch(Plane.XY.offset(71.4)):
        with Locations((-17.5, 40.5)):
            Rectangle(SKETCH_60_W, SKETCH_60_H)
    extrude(amount=-EXTRUDE_2_DEPTH)

    # Эскиз61 → Вырез-Вытянуть10 (cut, up to next)
    with BuildSketch(Plane.XY.offset(71.4), mode=Mode.PRIVATE) as cut_extrude_10_sk1:
        with Locations((-30, 60)):
            Circle(SKETCH_61_R)
    cut_extrude_10_tool1 = extrude(cut_extrude_10_sk1.sketch, amount=-CUT_EXTRUDE_10_REACH, mode=Mode.PRIVATE) & part.part
    # Эскиз61 → Вырез-Вытянуть10 (cut, up to next)
    with BuildSketch(Plane.XY.offset(71.4), mode=Mode.PRIVATE) as cut_extrude_10_sk2:
        with Locations((-30, 21)):
            Circle(SKETCH_61_R)
    cut_extrude_10_tool2 = extrude(cut_extrude_10_sk2.sketch, amount=-CUT_EXTRUDE_10_REACH, mode=Mode.PRIVATE) & part.part
    # Эскиз61 → Вырез-Вытянуть10 (cut, up to next)
    with BuildSketch(Plane.XY.offset(71.4), mode=Mode.PRIVATE) as cut_extrude_10_sk3:
        with Locations((5, 60)):
            Circle(SKETCH_61_R)
    cut_extrude_10_tool3 = extrude(cut_extrude_10_sk3.sketch, amount=-CUT_EXTRUDE_10_REACH, mode=Mode.PRIVATE) & part.part
    # Эскиз61 → Вырез-Вытянуть10 (cut, up to next)
    with BuildSketch(Plane.XY.offset(71.4), mode=Mode.PRIVATE) as cut_extrude_10_sk4:
        with Locations((5, 21)):
            Circle(SKETCH_61_R)
    cut_extrude_10_tool4 = extrude(cut_extrude_10_sk4.sketch, amount=-CUT_EXTRUDE_10_REACH, mode=Mode.PRIVATE) & part.part
    add(cut_extrude_10_tool1.solids().sort_by_distance((-30, 60, 71.4))[0], mode=Mode.SUBTRACT)
    add(cut_extrude_10_tool2.solids().sort_by_distance((-30, 21, 71.4))[0], mode=Mode.SUBTRACT)
    add(cut_extrude_10_tool3.solids().sort_by_distance((5, 60, 71.4))[0], mode=Mode.SUBTRACT)
    add(cut_extrude_10_tool4.solids().sort_by_distance((5, 21, 71.4))[0], mode=Mode.SUBTRACT)

    # Эскиз62 → Вырез-Вытянуть11 (cut, up to next)
    with BuildSketch(Plane(origin=(0, 0, 70.2), x_dir=(-1, 0, 0), z_dir=(0, 0, -1)), mode=Mode.PRIVATE) as cut_extrude_11_sk1:
        with Locations(Location((-24.47, 23.87, 0), (0, 0, 90))):
            Circle(SKETCH_62_R)
    cut_extrude_11_tool1 = extrude(cut_extrude_11_sk1.sketch, amount=-CUT_EXTRUDE_11_REACH, mode=Mode.PRIVATE) & part.part
    # Эскиз62 → Вырез-Вытянуть11 (cut, up to next)
    with BuildSketch(Plane(origin=(0, 0, 70.2), x_dir=(-1, 0, 0), z_dir=(0, 0, -1)), mode=Mode.PRIVATE) as cut_extrude_11_sk2:
        with Locations(Location((-24.47, 32.37, 0), (0, 0, 90))):
            Circle(SKETCH_62_R_2)
    cut_extrude_11_tool2 = extrude(cut_extrude_11_sk2.sketch, amount=-CUT_EXTRUDE_11_REACH, mode=Mode.PRIVATE) & part.part
    # Эскиз62 → Вырез-Вытянуть11 (cut, up to next)
    with BuildSketch(Plane(origin=(0, 0, 70.2), x_dir=(-1, 0, 0), z_dir=(0, 0, -1)), mode=Mode.PRIVATE) as cut_extrude_11_sk3:
        with Locations(Location((-24.47, 15.37, 0), (0, 0, 90))):
            Circle(SKETCH_62_R_2)
    cut_extrude_11_tool3 = extrude(cut_extrude_11_sk3.sketch, amount=-CUT_EXTRUDE_11_REACH, mode=Mode.PRIVATE) & part.part
    add(cut_extrude_11_tool1.solids().sort_by_distance((24.47, 23.87, 70.2))[0], mode=Mode.SUBTRACT)
    add(cut_extrude_11_tool2.solids().sort_by_distance((24.47, 32.37, 70.2))[0], mode=Mode.SUBTRACT)
    add(cut_extrude_11_tool3.solids().sort_by_distance((24.47, 15.37, 70.2))[0], mode=Mode.SUBTRACT)

    # Эскиз63 → Вырез-Вытянуть12 (cut, up to next)
    with BuildSketch(Plane.XY.offset(71.4), mode=Mode.PRIVATE) as cut_extrude_12_sk1:
        with Locations((9, 9)):
            Circle(SKETCH_63_R)
    cut_extrude_12_tool1 = extrude(cut_extrude_12_sk1.sketch, amount=-CUT_EXTRUDE_12_REACH, mode=Mode.PRIVATE) & part.part
    add(cut_extrude_12_tool1.solids().sort_by_distance((9, 9, 71.4))[0], mode=Mode.SUBTRACT)


solid = part.part
